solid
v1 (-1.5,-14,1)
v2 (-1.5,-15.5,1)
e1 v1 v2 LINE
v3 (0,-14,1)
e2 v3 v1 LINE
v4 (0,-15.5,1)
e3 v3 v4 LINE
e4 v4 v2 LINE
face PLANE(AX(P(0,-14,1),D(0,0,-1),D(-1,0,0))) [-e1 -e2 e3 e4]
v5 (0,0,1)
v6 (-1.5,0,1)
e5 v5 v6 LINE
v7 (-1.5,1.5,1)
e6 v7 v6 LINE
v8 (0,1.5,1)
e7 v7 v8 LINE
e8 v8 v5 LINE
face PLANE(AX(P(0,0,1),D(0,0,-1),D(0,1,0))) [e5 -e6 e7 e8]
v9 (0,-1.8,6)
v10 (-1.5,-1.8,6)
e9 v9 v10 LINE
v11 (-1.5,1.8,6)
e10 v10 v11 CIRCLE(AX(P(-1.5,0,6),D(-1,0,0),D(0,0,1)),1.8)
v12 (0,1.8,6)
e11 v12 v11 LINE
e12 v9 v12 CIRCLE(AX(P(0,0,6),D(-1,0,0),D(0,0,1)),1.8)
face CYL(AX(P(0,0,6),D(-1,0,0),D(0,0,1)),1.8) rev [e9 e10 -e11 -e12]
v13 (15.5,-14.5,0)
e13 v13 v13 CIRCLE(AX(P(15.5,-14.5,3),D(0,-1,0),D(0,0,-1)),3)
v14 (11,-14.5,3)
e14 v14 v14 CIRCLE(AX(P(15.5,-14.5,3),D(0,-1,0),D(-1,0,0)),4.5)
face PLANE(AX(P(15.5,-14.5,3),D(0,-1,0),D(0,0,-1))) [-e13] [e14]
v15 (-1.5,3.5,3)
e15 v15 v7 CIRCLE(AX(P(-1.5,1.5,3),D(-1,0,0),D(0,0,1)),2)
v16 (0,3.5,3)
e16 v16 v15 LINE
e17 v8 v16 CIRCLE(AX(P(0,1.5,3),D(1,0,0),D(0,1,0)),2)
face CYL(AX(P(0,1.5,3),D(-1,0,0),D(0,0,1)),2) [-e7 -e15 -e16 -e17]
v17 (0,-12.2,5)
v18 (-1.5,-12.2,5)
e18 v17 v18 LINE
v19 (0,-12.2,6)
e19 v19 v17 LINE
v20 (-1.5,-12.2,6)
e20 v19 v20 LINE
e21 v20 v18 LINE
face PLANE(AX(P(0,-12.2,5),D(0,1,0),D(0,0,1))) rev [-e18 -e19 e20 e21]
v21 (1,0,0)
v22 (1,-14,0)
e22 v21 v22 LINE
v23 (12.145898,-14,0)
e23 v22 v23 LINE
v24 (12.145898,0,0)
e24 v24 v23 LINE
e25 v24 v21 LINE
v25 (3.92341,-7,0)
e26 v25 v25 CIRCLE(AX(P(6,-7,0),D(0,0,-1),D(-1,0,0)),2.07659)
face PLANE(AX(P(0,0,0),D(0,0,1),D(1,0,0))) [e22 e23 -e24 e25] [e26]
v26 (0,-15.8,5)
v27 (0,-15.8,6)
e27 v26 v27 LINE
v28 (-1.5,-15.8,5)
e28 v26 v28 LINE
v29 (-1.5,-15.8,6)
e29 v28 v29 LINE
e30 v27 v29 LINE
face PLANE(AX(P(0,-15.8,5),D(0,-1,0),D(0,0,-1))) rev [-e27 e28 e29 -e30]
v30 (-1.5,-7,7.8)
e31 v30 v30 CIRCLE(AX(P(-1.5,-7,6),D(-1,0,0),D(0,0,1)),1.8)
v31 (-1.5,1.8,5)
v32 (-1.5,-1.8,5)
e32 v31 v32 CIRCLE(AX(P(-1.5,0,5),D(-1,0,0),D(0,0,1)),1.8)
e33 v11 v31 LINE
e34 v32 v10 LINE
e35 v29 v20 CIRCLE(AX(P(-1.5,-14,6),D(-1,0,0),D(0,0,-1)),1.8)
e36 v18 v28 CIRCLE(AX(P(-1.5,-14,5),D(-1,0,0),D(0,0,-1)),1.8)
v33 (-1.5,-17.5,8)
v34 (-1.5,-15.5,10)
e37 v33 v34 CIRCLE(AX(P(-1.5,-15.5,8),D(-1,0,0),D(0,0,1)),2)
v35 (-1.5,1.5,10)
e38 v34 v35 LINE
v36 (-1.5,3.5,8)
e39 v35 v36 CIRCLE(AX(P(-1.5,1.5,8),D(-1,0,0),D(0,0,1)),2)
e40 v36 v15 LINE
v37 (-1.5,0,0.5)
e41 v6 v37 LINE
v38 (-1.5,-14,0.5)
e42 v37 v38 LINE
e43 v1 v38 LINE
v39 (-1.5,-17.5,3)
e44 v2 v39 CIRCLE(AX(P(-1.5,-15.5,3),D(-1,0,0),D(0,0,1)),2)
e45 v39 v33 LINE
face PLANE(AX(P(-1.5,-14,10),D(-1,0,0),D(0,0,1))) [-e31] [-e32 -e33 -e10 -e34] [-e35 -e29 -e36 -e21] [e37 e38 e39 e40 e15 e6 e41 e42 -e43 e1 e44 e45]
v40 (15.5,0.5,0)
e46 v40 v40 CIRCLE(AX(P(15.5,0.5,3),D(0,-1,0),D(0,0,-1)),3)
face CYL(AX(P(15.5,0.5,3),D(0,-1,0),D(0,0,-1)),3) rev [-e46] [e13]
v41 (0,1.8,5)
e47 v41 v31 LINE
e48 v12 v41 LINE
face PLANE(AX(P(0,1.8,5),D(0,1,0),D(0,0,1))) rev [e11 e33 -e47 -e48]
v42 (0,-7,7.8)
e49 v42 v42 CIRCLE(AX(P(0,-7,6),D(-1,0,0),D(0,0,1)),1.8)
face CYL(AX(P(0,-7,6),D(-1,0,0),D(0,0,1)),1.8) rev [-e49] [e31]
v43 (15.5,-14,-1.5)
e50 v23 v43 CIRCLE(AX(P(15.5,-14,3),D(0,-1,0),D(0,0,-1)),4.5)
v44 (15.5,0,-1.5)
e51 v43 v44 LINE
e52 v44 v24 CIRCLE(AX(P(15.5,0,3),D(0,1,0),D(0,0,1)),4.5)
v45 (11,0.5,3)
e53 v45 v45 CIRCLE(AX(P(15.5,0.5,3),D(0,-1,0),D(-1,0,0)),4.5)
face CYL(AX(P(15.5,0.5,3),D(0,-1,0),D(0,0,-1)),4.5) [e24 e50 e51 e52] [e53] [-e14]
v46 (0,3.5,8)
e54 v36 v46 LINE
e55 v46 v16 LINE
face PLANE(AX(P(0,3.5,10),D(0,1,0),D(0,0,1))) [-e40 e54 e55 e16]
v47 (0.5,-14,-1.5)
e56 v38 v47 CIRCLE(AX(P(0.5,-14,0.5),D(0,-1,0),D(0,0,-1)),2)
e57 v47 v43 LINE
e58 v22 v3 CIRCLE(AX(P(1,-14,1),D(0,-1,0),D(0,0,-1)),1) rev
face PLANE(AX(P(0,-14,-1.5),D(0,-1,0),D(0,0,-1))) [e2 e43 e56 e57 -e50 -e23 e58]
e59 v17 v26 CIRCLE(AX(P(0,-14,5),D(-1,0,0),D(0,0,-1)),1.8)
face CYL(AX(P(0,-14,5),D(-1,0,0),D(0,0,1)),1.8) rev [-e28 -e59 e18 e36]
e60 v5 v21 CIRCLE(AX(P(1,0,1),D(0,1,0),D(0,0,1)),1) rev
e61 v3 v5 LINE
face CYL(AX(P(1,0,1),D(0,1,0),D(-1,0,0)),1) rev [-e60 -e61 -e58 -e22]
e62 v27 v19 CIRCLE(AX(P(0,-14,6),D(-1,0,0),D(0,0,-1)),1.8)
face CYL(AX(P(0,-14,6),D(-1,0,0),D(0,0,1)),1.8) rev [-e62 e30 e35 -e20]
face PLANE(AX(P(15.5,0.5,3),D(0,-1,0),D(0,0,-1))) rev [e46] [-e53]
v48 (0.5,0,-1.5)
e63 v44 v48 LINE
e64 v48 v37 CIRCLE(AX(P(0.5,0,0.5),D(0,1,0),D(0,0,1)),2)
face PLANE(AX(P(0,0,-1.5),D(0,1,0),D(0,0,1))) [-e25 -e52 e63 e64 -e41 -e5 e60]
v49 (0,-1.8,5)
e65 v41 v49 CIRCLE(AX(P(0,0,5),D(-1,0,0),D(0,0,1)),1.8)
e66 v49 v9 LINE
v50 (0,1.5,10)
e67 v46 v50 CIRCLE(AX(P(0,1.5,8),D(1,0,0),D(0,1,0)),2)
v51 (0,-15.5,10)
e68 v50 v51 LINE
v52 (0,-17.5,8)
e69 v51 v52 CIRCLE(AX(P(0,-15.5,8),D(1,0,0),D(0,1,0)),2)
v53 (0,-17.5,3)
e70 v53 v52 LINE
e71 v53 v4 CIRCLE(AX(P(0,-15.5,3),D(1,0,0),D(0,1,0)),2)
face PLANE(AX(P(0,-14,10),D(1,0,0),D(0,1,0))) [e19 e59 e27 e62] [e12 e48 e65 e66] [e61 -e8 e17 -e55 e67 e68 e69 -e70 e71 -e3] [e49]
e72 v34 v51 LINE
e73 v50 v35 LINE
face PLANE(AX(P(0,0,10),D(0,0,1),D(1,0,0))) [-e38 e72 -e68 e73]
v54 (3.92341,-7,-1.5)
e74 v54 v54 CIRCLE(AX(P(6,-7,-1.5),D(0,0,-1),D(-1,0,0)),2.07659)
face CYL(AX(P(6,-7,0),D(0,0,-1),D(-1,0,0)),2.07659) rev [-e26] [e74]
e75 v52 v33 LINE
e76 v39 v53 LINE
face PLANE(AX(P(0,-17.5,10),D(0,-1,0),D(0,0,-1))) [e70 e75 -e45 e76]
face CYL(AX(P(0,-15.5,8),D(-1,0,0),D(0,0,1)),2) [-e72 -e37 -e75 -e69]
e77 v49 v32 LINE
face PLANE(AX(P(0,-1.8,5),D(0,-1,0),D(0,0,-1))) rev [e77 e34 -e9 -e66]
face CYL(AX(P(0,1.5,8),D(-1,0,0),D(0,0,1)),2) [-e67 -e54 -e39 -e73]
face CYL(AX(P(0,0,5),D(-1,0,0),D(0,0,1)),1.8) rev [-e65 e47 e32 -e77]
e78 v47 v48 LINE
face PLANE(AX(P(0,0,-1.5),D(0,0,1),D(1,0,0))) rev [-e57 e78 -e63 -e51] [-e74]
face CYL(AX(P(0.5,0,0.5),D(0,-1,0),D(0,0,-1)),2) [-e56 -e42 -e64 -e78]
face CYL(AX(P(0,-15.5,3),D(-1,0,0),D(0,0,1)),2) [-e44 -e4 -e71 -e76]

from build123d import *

# Parameters (mm, degrees)
SKETCH_1_W             = 11
SKETCH_1_H             = 14
SM_BASE_FLANGE_1_DEPTH = 1.5
SKETCH_9_R             = 4.5
SKETCH_9_R_2           = 3
EXTRUDE_1_DEPTH        = 15
SKETCH_10_W            = 1.5
SKETCH_10_H            = 14
EXTRUDE_1_2_DEPTH      = 4.5
SKETCH_11_W            = 1.5
SKETCH_11_H            = 14
EXTRUDE_2_DEPTH        = 11.5
FILLET_2_R             = 2
FILLET_3_R             = 1
SKETCH_12_W            = 9
SKETCH_12_H            = 3.5
EXTRUDE_3_DEPTH        = 1.5
FILLET_4_R             = 2
SKETCH_13_R            = 1.8
CUT_EXTRUDE_1_DEPTH    = 1.5
SKETCH_14_R            = 2.076590198
CUT_EXTRUDE_2_DEPTH    = 1.5


# Sheet-metal steps are written as plain solids
with BuildPart() as part:
    # Sketch 1 → Базовая кромка1 (new body)
    with BuildSketch(Plane.XY):
        with Locations((5.5, -7)):
            Rectangle(SKETCH_1_W, SKETCH_1_H)
    extrude(amount=-SM_BASE_FLANGE_1_DEPTH)



with BuildPart() as body_2:
    # Эскиз9 → Extrude 1 (new body)
    with BuildSketch(Plane(origin=(0, -14.5, 0), x_dir=(-1, 0, 0), z_dir=(0, -1, 0))):
        with Locations((-15.5, -3)):
            Circle(SKETCH_9_R)
        with Locations((-15.5, -3)):
            Circle(SKETCH_9_R_2, mode=Mode.SUBTRACT)
    extrude(amount=-EXTRUDE_1_DEPTH)


with BuildPart() as part_1:
    add(part.part)

    add(body_2.part)  # Extrude 1 2 merges body 2
    # Эскиз10 → Extrude 1 2 (add)
    with BuildSketch(Plane(origin=(11, 0, 0), x_dir=(0, 0, -1), z_dir=(1, 0, 0))):
        with Locations((0.75, -7)):
            Rectangle(SKETCH_10_W, SKETCH_10_H)
    extrude(amount=EXTRUDE_1_2_DEPTH)

    # Эскиз11 → Бобышка-Вытянуть2 (add)
    with BuildSketch(Plane(origin=(0, 0, -1.5), x_dir=(-1, 0, 0), z_dir=(0, 0, -1))):
        with Locations((0.75, -7)):
            Rectangle(SKETCH_11_W, SKETCH_11_H)
    extrude(amount=-EXTRUDE_2_DEPTH)

    # Скругление2
    fillet_2_edges = [part_1.edges().sort_by_distance(p)[0] for p in [
        (-1.5, -7, -1.5),
    ]]
    fillet(fillet_2_edges, radius=FILLET_2_R)

    # Скругление3
    fillet_3_edges = [part_1.edges().sort_by_distance(p)[0] for p in [
        (0, -7, 0),
    ]]
    fillet(fillet_3_edges, radius=FILLET_3_R)

    # Эскиз12 → Бобышка-Вытянуть3 (add)
    with BuildSketch(Plane.ZY.offset(1.5)):
        with Locations((5.5, -15.75)):
            Rectangle(SKETCH_12_W, SKETCH_12_H)
        with Locations((5.5, 1.75)):
            Rectangle(SKETCH_12_W, SKETCH_12_H)
    extrude(amount=-EXTRUDE_3_DEPTH)

    # Скругление4
    fillet_4_edges = [part_1.edges().sort_by_distance(p)[0] for p in [
        (-0.75, -17.5, 10),
        (-0.75, -17.5, 1),
        (-0.75, 3.5, 10),
        (-0.75, 3.5, 1),
    ]]
    fillet(fillet_4_edges, radius=FILLET_4_R)

    # Эскиз13 → Вырез-Вытянуть1 (cut)
    with BuildSketch(Plane.ZY.offset(1.5)):
        with Locations((6, -7)):
            Circle(SKETCH_13_R)
        with BuildLine():
            Line((5, 1.8), (6, 1.8))
            ThreePointArc((6, 1.8), (7.8, 0), (6, -1.8))
            Line((6, -1.8), (5, -1.8))
            ThreePointArc((5, -1.8), (3.2, 0), (5, 1.8))
        make_face()
        with BuildLine():
            Line((5, -15.8), (6, -15.8))
            ThreePointArc((6, -15.8), (7.8, -14), (6, -12.2))
            Line((6, -12.2), (5, -12.2))
            ThreePointArc((5, -12.2), (3.2, -14), (5, -15.8))
        make_face()
    extrude(amount=-CUT_EXTRUDE_1_DEPTH, mode=Mode.SUBTRACT)

    # Эскиз14 → Вырез-Вытянуть2 (cut)
    with BuildSketch(Plane(origin=(0, 0, -1.5), x_dir=(-1, 0, 0), z_dir=(0, 0, -1))):
        with Locations((-6, -7)):
            Circle(SKETCH_14_R)
    extrude(amount=-CUT_EXTRUDE_2_DEPTH, mode=Mode.SUBTRACT)


solid = part_1.part
